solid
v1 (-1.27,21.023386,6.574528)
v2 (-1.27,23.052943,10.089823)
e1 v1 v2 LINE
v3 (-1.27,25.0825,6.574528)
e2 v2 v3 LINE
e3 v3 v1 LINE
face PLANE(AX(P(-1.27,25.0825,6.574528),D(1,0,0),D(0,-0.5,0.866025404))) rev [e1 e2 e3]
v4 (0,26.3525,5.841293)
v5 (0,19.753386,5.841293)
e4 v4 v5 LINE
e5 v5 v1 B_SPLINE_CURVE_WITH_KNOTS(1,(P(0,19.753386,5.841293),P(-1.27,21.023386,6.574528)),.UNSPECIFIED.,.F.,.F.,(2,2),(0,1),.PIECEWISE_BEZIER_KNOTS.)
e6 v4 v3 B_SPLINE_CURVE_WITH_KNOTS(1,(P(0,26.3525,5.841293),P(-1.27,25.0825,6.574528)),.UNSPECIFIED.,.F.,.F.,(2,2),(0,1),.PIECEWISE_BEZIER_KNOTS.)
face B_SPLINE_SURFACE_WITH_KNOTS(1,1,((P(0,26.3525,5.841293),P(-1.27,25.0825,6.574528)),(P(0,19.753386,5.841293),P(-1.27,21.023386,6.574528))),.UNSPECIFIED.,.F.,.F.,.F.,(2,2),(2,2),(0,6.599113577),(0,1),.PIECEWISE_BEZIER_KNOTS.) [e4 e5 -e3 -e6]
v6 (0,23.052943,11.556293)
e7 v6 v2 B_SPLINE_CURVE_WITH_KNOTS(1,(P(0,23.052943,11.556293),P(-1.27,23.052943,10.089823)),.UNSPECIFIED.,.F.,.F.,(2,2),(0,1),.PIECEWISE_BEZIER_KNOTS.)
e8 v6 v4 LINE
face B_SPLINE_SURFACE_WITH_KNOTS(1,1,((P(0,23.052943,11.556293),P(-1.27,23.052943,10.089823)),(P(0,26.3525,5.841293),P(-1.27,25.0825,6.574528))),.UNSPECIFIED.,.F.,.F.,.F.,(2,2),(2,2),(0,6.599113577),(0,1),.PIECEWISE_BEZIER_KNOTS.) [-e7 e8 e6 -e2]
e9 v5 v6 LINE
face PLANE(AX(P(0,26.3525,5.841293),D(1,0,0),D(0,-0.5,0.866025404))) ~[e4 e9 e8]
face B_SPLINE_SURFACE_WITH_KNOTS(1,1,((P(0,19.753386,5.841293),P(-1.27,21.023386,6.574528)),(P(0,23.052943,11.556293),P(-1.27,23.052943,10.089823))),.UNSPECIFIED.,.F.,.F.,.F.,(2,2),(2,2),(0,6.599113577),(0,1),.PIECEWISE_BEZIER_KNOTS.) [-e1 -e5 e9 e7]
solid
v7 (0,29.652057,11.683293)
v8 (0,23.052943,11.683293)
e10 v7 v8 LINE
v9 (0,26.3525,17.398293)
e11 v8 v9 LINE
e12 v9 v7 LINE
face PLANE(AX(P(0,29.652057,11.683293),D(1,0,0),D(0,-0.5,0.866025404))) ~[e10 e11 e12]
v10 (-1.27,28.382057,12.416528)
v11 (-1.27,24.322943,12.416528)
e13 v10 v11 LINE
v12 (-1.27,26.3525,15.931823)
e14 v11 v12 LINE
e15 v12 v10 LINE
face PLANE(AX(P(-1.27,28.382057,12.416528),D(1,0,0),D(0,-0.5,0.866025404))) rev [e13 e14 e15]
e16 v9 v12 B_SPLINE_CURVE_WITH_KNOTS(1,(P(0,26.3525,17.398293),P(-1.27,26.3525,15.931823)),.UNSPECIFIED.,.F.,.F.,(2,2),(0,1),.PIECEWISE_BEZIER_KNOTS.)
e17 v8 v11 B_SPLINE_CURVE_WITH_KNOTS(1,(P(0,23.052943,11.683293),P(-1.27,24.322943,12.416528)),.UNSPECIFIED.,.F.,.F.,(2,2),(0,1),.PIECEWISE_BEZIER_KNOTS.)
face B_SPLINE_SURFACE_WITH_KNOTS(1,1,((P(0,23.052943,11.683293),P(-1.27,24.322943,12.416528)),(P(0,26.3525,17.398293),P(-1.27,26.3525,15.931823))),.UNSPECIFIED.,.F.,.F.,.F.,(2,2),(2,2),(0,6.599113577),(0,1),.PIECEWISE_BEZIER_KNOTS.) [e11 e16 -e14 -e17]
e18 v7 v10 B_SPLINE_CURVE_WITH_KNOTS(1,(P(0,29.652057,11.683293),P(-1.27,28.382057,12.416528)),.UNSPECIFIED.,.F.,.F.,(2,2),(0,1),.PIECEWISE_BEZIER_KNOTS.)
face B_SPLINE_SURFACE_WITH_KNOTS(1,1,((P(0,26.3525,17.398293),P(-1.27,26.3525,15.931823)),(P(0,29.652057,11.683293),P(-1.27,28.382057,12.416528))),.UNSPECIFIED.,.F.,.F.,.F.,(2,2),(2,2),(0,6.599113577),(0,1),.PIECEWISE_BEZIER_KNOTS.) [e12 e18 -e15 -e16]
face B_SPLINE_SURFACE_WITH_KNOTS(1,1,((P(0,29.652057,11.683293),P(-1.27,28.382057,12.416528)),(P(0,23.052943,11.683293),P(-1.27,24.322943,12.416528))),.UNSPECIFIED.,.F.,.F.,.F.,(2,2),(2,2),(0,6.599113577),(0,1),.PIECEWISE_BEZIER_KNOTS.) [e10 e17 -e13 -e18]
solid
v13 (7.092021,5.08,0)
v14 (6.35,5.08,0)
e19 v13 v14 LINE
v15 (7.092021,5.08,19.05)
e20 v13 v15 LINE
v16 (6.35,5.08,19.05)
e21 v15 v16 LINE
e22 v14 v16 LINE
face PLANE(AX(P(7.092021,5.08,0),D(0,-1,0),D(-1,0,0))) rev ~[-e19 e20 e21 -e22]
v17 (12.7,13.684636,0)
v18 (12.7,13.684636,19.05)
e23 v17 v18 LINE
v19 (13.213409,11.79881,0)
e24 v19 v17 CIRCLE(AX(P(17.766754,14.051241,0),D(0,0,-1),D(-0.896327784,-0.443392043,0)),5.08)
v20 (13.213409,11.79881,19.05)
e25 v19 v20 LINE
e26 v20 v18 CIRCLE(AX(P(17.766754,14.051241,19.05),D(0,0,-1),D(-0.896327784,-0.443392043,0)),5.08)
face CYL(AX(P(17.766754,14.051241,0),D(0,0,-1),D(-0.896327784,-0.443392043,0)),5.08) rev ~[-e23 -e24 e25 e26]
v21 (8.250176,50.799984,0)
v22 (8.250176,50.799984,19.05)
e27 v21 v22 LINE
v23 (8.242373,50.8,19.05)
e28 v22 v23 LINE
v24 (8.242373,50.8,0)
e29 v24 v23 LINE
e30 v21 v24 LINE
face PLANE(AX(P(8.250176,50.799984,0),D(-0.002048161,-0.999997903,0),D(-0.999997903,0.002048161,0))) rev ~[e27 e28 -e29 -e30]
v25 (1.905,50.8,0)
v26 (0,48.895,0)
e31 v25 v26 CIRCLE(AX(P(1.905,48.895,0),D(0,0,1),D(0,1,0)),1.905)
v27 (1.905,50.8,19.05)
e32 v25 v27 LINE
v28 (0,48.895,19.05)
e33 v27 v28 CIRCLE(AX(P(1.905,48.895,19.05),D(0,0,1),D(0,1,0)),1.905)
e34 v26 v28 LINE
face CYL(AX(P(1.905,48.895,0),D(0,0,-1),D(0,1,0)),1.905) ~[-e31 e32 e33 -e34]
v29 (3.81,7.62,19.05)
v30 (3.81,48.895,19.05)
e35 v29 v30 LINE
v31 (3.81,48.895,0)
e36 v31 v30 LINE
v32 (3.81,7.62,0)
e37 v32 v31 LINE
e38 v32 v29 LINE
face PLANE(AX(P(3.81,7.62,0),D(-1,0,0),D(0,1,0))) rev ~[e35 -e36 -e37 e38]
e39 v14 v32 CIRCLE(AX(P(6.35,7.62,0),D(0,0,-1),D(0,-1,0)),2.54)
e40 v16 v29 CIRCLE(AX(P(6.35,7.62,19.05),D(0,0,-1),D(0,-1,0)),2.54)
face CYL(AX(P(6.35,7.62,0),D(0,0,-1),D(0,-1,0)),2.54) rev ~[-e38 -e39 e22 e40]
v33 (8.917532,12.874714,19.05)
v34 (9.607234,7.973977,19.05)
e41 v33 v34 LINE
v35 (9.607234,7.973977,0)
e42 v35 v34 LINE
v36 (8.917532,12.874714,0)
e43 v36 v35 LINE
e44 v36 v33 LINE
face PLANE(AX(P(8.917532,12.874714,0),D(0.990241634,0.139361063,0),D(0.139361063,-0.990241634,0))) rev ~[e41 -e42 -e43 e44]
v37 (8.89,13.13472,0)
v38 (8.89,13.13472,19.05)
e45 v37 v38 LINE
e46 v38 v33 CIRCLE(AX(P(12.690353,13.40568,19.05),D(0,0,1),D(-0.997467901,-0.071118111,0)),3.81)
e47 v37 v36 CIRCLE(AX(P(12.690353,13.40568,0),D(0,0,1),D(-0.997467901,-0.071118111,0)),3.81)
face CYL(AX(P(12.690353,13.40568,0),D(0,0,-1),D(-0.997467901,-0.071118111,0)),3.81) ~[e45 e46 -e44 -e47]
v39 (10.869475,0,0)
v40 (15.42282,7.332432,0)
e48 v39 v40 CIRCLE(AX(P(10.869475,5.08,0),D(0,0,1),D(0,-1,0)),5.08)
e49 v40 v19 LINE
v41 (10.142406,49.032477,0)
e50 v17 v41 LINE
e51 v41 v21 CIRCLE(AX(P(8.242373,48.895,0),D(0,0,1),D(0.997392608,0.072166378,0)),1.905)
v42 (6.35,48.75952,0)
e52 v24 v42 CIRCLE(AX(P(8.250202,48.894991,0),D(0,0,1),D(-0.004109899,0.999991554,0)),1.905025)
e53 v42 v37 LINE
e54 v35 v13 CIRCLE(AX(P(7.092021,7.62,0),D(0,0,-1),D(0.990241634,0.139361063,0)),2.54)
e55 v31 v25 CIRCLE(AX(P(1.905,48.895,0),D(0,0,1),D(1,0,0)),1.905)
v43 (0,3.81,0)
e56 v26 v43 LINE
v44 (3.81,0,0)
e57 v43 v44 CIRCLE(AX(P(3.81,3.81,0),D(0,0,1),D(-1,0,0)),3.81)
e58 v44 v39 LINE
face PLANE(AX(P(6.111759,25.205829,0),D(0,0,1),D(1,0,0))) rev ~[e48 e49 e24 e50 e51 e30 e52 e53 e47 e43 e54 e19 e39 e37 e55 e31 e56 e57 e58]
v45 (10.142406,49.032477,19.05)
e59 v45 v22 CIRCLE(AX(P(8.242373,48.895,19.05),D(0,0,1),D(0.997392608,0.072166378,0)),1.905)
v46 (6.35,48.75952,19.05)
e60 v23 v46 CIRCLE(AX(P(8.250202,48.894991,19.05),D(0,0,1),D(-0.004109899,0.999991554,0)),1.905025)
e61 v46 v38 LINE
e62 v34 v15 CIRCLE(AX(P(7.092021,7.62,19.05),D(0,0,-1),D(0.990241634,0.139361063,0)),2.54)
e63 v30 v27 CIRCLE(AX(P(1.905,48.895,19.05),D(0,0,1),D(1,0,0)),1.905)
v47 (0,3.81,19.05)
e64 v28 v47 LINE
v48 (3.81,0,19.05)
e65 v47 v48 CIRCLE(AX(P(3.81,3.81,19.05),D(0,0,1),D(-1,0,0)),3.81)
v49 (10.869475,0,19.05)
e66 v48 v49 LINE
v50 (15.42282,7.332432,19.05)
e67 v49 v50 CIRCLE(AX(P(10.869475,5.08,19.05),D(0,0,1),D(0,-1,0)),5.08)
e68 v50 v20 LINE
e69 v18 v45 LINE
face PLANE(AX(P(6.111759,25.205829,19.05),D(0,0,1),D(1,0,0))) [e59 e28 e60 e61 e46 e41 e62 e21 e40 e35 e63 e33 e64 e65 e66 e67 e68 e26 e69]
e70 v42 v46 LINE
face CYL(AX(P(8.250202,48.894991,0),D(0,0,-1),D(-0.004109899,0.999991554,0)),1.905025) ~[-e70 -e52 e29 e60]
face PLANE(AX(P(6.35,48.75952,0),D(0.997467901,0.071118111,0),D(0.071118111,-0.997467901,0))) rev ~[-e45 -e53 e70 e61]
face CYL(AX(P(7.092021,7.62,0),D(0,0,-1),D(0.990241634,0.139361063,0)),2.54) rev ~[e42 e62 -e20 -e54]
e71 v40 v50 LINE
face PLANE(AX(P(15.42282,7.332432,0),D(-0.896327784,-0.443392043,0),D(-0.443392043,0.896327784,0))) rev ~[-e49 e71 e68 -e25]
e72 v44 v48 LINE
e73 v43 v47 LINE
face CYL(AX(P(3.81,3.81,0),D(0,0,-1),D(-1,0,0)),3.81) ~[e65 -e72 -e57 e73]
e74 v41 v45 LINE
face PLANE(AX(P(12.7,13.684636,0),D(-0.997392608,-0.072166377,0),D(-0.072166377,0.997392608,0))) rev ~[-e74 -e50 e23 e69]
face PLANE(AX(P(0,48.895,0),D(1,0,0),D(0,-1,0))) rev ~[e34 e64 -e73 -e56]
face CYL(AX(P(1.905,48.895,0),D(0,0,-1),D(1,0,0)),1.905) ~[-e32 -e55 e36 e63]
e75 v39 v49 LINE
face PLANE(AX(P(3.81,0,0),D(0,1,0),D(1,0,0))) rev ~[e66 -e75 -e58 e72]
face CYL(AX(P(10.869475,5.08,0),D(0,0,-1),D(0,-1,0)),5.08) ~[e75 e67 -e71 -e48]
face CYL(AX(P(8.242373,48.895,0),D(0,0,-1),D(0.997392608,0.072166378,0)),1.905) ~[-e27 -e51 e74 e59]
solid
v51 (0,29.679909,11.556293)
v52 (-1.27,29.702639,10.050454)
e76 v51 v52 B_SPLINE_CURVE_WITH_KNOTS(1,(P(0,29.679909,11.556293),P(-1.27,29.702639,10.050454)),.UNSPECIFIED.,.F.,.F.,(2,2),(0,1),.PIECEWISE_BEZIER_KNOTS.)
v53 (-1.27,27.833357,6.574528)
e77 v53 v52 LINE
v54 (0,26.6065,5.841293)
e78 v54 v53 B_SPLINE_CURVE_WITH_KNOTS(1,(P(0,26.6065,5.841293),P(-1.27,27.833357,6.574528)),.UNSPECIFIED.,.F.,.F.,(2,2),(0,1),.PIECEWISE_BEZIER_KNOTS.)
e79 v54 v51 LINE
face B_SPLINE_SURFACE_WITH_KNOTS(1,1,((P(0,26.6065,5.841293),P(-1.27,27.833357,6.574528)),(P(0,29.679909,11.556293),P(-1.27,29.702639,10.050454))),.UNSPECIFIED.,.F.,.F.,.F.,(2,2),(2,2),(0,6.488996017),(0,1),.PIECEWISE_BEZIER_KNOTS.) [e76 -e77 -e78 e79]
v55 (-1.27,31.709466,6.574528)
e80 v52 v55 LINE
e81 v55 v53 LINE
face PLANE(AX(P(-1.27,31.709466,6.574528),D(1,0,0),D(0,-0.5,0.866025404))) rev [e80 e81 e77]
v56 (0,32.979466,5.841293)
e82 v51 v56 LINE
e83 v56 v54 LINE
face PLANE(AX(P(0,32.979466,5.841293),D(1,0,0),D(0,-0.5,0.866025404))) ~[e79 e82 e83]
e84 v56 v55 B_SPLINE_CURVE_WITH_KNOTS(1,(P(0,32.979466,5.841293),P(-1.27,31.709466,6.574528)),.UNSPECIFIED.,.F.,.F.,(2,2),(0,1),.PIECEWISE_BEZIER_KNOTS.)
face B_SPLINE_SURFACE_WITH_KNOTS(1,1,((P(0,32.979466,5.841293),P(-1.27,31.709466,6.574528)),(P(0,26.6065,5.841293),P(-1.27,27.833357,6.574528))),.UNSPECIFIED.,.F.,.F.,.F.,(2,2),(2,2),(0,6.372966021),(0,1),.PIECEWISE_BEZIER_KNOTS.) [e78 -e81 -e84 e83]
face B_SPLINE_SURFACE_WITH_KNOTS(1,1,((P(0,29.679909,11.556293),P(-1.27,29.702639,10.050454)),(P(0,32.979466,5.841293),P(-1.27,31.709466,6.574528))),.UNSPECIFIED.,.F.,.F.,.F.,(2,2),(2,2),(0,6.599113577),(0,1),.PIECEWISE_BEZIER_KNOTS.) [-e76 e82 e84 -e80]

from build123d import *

# Parameters (mm, degrees)
F1_DEPTH = 19.05
F3_DEPTH = 1.27
F3_TAPER = 30


# Not quite as in the source:
# - ends of sketch curves that miss each other by under 0.0002 mm in the source are joined


with BuildPart() as f1:
    # F0 (on Top) → F1 (new body)
    with BuildSketch(Plane.XY):
        with BuildLine():
            Line((0, 48.895), (0, 3.81))
            ThreePointArc((0, 3.81), (1.1159231637, 1.1159231637), (3.81, 0))
            Line((3.81, 0), (10.8694752949, 0))
            ThreePointArc((10.8694752949, 0), (15.1850721495, 2.4000701897), (15.4228204366, 7.3324315794))
            Line((15.4228204366, 7.3324315794), (13.2134093055, 11.7988098401))
            ThreePointArc((13.2134093055, 11.7988098401), (12.8651563088, 12.7167993307), (12.7, 13.684636222))
            Line((12.7, 13.684636222), (10.1424057316, 49.0324769491))
            ThreePointArc((10.1424057316, 49.0324769491), (9.5427497716, 50.2871367633), (8.2501762867, 50.7999840172))
            Line((8.2501762867, 50.7999840172), (8.2423728139, 50.8))
            ThreePointArc((8.2423728139, 50.8), (6.8534050374, 50.1903975816), (6.35, 48.7595199989))
            Line((6.35, 48.7595199989), (8.89, 13.134720074))
            ThreePointArc((8.89, 13.134720074), (8.901535038, 13.0044810095), (8.9175320778, 12.8747144278))
            Line((8.9175320778, 12.8747144278), (9.607234407, 7.973977099))
            ThreePointArc((9.607234407, 7.973977099), (9.009141131, 5.9537920045), (7.092020656, 5.08))
            Line((7.092020656, 5.08), (6.35, 5.08))
            ThreePointArc((6.35, 5.08), (4.5539487758, 5.8239487758), (3.81, 7.62))
            Line((3.81, 7.62), (3.81, 48.895))
            ThreePointArc((3.81, 48.895), (3.2520384182, 50.2420384182), (1.905, 50.8))
            ThreePointArc((1.905, 50.8), (0.5579615818, 50.2420384182), (0, 48.895))
        make_face()
    extrude(amount=F1_DEPTH)


with BuildPart() as f3:
    # F2 (on face) → F3 (new body)
    with BuildSketch(Plane(origin=(0, 0, 0), x_dir=(0, -1, 0), z_dir=(-1, 0, 0))):
        Polygon((-29.6520567884, 11.6832929166), (-23.0529432116, 11.6832929166), (-26.3525, 17.3982929166), align=None)
    extrude(amount=F3_DEPTH, taper=F3_TAPER)


with BuildPart() as f3b:
    # F2 (on face) → F3, piece 2 (new body)
    with BuildSketch(Plane(origin=(0, 0, 0), x_dir=(0, -1, 0), z_dir=(-1, 0, 0))):
        Polygon((-32.9794660211, 5.8412929166), (-26.6065, 5.8412929166), (-29.6799092326, 11.5562929166), align=None)
    extrude(amount=F3_DEPTH, taper=F3_TAPER)


with BuildPart() as f3c:
    # F2 (on face) → F3, piece 3 (new body)
    with BuildSketch(Plane(origin=(0, 0, 0), x_dir=(0, -1, 0), z_dir=(-1, 0, 0))):
        Polygon((-26.3525, 5.8412929166), (-19.7533864232, 5.8412929166), (-23.0529432116, 11.5562929166), align=None)
    extrude(amount=F3_DEPTH, taper=F3_TAPER)


solid = Compound([f1.part, f3.part, f3b.part, f3c.part])
